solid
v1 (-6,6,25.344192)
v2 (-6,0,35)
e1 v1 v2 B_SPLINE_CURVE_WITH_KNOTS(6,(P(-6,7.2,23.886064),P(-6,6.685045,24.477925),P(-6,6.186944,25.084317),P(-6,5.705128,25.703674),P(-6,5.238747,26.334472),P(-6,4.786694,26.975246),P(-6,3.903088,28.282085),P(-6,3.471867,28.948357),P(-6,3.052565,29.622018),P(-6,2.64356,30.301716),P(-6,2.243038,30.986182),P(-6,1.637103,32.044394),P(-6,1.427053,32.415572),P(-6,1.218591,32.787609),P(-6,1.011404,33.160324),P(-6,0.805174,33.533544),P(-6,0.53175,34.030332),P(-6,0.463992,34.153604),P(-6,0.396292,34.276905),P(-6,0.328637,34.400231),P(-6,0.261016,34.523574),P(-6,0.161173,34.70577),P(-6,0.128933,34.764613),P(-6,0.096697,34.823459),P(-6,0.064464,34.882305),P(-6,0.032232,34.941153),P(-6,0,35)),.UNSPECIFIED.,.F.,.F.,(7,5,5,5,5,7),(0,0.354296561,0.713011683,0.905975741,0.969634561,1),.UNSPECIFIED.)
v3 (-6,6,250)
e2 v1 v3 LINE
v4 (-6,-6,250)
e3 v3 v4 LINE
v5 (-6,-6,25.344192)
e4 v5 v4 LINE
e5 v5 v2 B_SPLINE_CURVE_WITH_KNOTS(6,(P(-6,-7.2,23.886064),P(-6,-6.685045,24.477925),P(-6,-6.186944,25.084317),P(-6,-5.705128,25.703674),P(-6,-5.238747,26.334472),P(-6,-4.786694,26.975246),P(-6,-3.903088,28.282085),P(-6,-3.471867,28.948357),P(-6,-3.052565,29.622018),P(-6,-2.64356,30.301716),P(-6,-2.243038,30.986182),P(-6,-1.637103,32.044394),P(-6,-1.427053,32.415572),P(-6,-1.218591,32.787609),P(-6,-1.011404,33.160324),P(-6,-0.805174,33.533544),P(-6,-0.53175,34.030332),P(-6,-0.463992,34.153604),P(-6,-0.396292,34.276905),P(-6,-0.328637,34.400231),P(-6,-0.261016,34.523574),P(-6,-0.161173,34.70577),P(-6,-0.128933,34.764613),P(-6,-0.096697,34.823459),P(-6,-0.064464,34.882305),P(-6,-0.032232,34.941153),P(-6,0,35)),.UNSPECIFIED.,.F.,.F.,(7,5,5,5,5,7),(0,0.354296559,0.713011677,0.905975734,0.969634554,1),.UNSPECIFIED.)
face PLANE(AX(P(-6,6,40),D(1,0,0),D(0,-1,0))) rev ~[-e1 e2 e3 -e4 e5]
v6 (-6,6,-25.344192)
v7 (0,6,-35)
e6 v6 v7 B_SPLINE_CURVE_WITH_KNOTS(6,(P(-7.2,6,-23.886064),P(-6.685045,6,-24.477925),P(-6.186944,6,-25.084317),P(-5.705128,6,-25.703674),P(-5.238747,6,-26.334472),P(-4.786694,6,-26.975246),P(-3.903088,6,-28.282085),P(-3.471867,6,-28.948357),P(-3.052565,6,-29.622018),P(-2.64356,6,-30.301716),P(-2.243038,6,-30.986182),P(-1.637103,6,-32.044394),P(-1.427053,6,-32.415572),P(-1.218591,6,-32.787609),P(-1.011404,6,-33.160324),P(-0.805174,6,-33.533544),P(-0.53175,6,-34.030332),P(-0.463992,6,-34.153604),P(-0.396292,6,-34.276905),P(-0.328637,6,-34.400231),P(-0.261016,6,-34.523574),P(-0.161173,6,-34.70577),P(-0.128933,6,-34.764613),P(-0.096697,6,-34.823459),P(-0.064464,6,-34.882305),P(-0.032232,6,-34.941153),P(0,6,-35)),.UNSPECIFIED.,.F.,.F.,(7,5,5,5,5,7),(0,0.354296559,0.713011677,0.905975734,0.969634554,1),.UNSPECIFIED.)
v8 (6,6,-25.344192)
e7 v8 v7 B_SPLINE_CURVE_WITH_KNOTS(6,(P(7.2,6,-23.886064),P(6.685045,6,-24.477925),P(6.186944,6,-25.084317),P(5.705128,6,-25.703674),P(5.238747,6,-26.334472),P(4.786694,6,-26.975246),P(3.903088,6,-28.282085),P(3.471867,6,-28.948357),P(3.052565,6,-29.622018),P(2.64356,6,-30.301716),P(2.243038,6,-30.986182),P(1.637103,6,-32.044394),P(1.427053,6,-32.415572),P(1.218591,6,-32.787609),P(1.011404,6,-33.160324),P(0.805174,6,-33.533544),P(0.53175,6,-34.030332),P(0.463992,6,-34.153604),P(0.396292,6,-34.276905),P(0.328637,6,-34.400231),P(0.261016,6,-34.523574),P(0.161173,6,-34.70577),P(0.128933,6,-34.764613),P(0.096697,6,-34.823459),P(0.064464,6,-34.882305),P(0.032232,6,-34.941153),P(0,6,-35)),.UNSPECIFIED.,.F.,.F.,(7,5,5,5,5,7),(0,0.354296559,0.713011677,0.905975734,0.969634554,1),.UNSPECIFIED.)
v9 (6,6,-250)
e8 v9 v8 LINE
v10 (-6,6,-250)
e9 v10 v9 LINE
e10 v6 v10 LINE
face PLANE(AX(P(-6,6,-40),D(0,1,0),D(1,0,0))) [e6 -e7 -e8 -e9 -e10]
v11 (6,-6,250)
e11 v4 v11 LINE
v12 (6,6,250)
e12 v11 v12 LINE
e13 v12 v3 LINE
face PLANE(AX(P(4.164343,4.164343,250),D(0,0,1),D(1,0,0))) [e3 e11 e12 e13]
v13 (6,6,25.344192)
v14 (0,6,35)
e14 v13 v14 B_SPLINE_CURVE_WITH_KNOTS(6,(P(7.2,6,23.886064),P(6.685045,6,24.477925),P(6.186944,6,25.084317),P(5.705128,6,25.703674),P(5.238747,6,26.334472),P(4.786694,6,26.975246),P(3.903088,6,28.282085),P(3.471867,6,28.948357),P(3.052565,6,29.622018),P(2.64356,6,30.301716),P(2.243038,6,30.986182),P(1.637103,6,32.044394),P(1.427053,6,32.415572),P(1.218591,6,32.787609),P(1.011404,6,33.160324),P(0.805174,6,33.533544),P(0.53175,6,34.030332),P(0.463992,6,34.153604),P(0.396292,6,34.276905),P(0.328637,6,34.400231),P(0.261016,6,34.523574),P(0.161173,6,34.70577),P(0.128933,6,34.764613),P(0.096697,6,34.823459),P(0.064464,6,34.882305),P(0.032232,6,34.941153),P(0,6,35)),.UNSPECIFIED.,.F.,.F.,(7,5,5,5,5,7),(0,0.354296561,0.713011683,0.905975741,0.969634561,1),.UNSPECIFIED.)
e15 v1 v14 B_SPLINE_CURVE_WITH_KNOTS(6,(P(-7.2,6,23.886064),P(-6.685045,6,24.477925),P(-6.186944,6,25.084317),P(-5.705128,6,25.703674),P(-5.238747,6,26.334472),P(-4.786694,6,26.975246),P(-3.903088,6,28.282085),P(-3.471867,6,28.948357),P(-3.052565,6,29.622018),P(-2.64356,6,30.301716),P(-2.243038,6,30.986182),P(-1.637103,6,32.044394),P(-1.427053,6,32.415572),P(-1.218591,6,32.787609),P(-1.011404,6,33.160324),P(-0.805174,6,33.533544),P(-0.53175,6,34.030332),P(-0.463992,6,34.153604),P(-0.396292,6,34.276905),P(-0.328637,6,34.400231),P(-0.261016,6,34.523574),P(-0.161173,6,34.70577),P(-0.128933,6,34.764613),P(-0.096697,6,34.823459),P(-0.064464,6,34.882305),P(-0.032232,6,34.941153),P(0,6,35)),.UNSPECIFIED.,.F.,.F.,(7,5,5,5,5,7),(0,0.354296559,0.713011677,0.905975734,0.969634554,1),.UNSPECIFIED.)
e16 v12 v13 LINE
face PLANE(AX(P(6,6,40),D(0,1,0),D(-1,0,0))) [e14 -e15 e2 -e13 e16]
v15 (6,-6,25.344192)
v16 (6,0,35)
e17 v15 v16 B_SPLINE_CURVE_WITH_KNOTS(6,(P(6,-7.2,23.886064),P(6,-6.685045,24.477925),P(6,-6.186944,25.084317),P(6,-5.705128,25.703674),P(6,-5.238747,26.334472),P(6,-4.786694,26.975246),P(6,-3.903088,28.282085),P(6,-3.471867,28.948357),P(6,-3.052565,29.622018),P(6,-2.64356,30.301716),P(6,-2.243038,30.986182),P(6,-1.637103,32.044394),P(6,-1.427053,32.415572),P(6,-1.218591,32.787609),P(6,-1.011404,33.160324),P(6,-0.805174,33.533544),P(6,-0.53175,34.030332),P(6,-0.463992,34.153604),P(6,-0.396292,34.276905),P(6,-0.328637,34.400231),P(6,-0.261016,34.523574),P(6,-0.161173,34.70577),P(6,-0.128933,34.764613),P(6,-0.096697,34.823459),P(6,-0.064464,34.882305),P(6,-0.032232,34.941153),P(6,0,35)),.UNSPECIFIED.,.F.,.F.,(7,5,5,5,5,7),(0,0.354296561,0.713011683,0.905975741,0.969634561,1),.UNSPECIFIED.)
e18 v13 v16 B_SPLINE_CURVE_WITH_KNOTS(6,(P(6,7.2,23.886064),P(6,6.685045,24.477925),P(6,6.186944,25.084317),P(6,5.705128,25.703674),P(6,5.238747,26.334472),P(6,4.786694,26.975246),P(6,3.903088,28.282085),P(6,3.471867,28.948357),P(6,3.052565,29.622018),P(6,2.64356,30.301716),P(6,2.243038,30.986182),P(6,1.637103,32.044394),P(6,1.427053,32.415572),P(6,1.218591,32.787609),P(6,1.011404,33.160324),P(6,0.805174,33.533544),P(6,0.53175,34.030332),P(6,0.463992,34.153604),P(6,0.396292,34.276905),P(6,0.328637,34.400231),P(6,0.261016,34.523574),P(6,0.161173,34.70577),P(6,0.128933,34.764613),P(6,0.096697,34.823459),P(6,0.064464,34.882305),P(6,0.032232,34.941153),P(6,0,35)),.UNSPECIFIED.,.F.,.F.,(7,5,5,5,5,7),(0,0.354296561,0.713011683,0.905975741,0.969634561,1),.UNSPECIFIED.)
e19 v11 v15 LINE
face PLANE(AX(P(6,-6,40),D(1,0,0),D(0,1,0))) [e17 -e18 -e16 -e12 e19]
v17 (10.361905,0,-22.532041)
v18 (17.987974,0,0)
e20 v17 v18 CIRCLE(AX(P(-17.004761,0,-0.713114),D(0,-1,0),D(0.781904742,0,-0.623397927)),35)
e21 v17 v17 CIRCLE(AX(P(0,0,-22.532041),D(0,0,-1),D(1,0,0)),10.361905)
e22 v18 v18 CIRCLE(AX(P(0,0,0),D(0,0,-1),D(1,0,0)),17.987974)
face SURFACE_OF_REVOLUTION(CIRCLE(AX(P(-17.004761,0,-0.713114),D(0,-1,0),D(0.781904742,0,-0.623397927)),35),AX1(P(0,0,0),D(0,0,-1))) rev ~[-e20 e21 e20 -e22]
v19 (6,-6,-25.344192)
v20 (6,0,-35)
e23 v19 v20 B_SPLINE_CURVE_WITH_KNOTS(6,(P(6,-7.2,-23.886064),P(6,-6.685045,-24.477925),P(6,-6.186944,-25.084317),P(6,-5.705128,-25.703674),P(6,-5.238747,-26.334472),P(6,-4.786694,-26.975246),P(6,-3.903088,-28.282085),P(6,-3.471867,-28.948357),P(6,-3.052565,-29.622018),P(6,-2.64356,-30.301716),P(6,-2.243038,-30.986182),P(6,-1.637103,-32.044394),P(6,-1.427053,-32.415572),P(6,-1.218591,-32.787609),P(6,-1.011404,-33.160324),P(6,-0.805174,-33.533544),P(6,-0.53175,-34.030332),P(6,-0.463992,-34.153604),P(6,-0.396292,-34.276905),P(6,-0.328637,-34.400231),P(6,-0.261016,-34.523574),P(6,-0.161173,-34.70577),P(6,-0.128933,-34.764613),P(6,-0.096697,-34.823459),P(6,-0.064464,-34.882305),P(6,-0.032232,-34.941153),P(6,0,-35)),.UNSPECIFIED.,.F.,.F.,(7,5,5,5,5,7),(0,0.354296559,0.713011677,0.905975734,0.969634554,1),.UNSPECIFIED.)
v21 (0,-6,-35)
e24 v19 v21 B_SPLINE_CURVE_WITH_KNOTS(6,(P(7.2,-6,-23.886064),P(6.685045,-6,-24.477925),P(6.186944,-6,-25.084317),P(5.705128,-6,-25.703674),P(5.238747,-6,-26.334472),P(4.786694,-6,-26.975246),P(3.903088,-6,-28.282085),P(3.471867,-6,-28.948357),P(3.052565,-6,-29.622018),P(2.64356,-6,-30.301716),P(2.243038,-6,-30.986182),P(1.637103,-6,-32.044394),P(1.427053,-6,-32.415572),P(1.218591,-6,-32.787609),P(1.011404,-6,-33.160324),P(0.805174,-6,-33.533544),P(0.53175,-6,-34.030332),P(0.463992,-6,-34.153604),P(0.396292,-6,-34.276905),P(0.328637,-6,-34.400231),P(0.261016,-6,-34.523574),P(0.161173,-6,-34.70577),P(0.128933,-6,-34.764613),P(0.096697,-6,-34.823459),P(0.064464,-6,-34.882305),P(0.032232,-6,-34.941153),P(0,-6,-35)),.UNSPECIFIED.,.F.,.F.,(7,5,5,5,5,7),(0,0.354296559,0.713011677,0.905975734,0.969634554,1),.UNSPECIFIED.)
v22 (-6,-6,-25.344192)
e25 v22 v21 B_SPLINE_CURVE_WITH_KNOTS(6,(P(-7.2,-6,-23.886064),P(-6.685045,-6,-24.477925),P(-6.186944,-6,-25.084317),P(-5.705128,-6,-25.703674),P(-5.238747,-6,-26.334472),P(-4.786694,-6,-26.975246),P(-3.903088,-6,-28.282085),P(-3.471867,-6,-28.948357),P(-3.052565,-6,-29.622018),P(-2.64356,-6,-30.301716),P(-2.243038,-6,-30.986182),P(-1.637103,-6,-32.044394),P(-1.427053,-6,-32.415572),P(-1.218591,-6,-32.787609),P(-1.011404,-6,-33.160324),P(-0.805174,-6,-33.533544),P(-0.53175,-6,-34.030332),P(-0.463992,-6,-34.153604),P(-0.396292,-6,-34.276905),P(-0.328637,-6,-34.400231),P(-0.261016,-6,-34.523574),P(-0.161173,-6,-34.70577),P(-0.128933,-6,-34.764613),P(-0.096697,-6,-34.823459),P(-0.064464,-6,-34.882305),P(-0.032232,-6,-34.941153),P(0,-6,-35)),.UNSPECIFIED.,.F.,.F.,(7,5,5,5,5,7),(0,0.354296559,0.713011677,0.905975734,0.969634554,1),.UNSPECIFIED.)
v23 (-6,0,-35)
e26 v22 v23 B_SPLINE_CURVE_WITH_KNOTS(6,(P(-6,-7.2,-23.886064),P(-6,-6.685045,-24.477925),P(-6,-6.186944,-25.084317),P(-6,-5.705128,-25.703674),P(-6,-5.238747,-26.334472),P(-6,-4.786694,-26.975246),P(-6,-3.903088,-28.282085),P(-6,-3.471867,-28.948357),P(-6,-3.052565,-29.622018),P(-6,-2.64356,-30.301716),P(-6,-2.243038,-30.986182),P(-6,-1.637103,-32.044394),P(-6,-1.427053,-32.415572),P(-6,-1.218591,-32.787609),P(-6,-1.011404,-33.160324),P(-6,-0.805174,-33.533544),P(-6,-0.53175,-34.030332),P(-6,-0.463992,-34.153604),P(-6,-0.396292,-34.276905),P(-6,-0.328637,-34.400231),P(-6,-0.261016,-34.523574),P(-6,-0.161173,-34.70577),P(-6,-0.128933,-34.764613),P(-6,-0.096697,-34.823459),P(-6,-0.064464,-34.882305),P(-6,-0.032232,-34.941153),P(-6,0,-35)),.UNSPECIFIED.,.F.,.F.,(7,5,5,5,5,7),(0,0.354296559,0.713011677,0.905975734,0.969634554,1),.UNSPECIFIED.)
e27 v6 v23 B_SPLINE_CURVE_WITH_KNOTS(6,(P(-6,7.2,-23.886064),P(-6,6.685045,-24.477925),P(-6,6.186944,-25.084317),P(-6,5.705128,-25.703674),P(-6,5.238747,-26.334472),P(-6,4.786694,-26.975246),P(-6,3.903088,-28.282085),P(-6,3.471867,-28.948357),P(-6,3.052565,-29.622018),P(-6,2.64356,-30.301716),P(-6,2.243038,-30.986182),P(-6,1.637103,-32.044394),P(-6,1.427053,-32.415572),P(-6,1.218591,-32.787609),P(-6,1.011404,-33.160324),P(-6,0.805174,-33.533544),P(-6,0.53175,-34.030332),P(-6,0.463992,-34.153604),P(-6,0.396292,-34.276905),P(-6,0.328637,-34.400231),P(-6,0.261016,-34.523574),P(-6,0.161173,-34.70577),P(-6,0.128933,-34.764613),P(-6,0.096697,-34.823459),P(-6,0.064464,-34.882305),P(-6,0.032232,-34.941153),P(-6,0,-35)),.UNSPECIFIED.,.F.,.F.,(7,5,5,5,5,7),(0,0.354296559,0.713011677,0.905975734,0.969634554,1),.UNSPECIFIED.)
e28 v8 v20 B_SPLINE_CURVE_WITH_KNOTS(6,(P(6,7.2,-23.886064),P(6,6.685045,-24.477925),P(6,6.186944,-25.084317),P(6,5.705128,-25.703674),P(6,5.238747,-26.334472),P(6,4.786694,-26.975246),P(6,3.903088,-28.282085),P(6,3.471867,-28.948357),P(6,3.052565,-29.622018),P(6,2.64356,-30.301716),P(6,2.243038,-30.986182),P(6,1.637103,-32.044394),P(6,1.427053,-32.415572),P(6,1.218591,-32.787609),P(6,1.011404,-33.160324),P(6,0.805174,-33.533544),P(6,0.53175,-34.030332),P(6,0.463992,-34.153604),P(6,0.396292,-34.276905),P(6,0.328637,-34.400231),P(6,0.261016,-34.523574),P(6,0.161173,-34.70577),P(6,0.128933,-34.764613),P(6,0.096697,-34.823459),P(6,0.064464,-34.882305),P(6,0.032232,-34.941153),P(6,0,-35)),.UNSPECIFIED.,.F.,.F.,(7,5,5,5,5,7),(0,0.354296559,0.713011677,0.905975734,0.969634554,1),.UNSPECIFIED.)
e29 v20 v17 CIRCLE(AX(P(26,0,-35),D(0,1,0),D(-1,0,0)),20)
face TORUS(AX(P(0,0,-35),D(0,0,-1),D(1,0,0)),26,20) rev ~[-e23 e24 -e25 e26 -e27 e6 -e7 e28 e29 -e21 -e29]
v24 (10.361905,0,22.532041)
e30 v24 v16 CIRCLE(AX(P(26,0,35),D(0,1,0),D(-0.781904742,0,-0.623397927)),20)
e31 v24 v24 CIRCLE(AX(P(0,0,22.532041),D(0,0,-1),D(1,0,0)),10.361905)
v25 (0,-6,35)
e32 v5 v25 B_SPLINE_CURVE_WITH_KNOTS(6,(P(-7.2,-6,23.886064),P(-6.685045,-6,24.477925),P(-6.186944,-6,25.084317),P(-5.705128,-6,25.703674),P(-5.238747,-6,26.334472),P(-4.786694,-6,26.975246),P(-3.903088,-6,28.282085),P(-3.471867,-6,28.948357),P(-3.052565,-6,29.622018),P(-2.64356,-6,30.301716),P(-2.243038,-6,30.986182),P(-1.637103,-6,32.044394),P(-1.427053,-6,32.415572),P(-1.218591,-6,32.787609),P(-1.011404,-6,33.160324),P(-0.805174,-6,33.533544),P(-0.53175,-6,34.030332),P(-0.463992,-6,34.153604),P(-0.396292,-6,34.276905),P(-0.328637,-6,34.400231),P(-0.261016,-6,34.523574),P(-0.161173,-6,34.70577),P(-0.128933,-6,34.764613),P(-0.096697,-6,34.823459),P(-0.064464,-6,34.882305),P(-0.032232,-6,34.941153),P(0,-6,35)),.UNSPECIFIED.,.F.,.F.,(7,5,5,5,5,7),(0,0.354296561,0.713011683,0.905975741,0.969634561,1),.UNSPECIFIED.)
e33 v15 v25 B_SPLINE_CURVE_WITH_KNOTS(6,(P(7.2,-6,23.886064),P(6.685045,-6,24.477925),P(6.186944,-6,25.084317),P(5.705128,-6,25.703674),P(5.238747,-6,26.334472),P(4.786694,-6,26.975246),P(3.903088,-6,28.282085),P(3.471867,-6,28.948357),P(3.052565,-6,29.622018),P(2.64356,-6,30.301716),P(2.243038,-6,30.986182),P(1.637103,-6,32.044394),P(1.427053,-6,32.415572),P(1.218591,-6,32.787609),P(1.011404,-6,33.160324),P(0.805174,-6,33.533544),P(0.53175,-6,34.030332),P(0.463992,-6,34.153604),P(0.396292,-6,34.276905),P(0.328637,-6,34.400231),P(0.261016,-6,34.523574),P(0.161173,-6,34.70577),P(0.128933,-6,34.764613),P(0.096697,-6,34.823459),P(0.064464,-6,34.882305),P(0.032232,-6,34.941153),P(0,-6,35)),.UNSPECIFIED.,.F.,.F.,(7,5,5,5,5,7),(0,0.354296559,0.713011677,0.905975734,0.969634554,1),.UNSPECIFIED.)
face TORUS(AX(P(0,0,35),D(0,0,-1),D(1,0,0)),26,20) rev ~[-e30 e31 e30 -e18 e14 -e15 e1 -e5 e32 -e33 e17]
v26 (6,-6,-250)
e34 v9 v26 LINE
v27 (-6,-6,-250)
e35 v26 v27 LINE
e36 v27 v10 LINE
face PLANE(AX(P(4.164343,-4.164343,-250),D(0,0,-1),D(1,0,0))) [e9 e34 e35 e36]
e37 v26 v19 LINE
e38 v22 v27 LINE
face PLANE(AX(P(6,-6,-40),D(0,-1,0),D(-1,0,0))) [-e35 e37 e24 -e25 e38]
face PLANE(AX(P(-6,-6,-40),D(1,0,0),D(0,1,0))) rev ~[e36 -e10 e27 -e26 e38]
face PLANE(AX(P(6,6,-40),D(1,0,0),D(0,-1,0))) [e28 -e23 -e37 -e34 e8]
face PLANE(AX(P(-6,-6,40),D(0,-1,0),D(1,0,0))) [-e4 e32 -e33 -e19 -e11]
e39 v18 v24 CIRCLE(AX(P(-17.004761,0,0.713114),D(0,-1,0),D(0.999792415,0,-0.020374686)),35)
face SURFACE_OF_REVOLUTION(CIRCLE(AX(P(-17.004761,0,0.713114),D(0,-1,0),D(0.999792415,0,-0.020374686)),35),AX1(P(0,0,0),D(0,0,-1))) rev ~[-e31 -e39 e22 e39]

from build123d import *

# Parameters (mm, degrees)
F3_DEPTH      = 210
F3_DEPTH_BACK = 25
F5_DEPTH      = 210
F5_DEPTH_BACK = 25


with BuildPart() as f1:
    # F0 (on Front) → F1 (revolve)
    with BuildSketch(Plane.XZ):
        with BuildLine():
            Line((6, 40), (0, 40))
            Line((0, 40), (0, -40))
            Line((0, -40), (6, -40))
            Line((6, -40), (6, -35))
            ThreePointArc((6, -35), (7.121945325, -28.3955279025), (10.3619051686, -22.5320414644))
            ThreePointArc((10.3619051686, -22.5320414644), (16.1478700246, -11.9337677658), (17.9879737223, 0))
            ThreePointArc((17.9879737223, 0), (16.1478700246, 11.9337677658), (10.3619051686, 22.5320414644))
            ThreePointArc((10.3619051686, 22.5320414644), (7.121945325, 28.3955279025), (6, 35))
            Line((6, 35), (6, 40))
        make_face()
    revolve(axis=Axis((0, 0, 0), (0, 0, -1)))

    # F2 (on face) → F3 (join, two sides)
    with BuildSketch(Plane.XY.offset(40)) as f3_sk:
        with BuildLine():
            Line((6, 0), (6, 6))
            Line((6, 6), (0, 6))
            ThreePointArc((0, 6), (4.2426406871, 4.2426406871), (6, 0))
        make_face()
        with BuildLine():
            ThreePointArc((-6, 0), (-4.2426406871, 4.2426406871), (0, 6))
            Line((0, 6), (-6, 6))
            Line((-6, 6), (-6, 0))
        make_face()
        with BuildLine():
            ThreePointArc((0, -6), (-4.2426406871, -4.2426406871), (-6, 0))
            Line((-6, 0), (-6, -6))
            Line((-6, -6), (0, -6))
        make_face()
        with BuildLine():
            Line((6, -6), (6, 0))
            ThreePointArc((6, 0), (4.2426406871, -4.2426406871), (0, -6))
            Line((0, -6), (6, -6))
        make_face()
        with BuildLine():
            ThreePointArc((6, 0), (4.2426406871, 4.2426406871), (0, 6))
            ThreePointArc((0, 6), (-4.2426406871, 4.2426406871), (-6, 0))
            ThreePointArc((-6, 0), (-4.2426406871, -4.2426406871), (0, -6))
            ThreePointArc((0, -6), (4.2426406871, -4.2426406871), (6, 0))
        make_face()
    extrude(amount=F3_DEPTH)
    extrude(f3_sk.sketch, amount=-F3_DEPTH_BACK)

    # F4 (on face) → F5 (join, two sides)
    with BuildSketch(Plane(origin=(0, 0, -40), x_dir=(1, 0, 0), z_dir=(0, 0, -1))) as f5_sk:
        with BuildLine():
            Line((6, 0), (6, 6))
            Line((6, 6), (0, 6))
            ThreePointArc((0, 6), (4.2426406871, 4.2426406871), (6, 0))
        make_face()
        with BuildLine():
            ThreePointArc((-6, 0), (-4.2426406871, 4.2426406871), (0, 6))
            Line((0, 6), (-6, 6))
            Line((-6, 6), (-6, 0))
        make_face()
        with BuildLine():
            ThreePointArc((6, 0), (4.2426406871, 4.2426406871), (0, 6))
            ThreePointArc((0, 6), (-4.2426406871, 4.2426406871), (-6, 0))
            ThreePointArc((-6, 0), (-4.2426406871, -4.2426406871), (0, -6))
            ThreePointArc((0, -6), (4.2426406871, -4.2426406871), (6, 0))
        make_face()
        with BuildLine():
            Line((6, -6), (6, 0))
            ThreePointArc((6, 0), (4.2426406871, -4.2426406871), (0, -6))
            Line((0, -6), (6, -6))
        make_face()
        with BuildLine():
            ThreePointArc((0, -6), (-4.2426406871, -4.2426406871), (-6, 0))
            Line((-6, 0), (-6, -6))
            Line((-6, -6), (0, -6))
        make_face()
    extrude(amount=F5_DEPTH)
    extrude(f5_sk.sketch, amount=-F5_DEPTH_BACK)


solid = f1.part
